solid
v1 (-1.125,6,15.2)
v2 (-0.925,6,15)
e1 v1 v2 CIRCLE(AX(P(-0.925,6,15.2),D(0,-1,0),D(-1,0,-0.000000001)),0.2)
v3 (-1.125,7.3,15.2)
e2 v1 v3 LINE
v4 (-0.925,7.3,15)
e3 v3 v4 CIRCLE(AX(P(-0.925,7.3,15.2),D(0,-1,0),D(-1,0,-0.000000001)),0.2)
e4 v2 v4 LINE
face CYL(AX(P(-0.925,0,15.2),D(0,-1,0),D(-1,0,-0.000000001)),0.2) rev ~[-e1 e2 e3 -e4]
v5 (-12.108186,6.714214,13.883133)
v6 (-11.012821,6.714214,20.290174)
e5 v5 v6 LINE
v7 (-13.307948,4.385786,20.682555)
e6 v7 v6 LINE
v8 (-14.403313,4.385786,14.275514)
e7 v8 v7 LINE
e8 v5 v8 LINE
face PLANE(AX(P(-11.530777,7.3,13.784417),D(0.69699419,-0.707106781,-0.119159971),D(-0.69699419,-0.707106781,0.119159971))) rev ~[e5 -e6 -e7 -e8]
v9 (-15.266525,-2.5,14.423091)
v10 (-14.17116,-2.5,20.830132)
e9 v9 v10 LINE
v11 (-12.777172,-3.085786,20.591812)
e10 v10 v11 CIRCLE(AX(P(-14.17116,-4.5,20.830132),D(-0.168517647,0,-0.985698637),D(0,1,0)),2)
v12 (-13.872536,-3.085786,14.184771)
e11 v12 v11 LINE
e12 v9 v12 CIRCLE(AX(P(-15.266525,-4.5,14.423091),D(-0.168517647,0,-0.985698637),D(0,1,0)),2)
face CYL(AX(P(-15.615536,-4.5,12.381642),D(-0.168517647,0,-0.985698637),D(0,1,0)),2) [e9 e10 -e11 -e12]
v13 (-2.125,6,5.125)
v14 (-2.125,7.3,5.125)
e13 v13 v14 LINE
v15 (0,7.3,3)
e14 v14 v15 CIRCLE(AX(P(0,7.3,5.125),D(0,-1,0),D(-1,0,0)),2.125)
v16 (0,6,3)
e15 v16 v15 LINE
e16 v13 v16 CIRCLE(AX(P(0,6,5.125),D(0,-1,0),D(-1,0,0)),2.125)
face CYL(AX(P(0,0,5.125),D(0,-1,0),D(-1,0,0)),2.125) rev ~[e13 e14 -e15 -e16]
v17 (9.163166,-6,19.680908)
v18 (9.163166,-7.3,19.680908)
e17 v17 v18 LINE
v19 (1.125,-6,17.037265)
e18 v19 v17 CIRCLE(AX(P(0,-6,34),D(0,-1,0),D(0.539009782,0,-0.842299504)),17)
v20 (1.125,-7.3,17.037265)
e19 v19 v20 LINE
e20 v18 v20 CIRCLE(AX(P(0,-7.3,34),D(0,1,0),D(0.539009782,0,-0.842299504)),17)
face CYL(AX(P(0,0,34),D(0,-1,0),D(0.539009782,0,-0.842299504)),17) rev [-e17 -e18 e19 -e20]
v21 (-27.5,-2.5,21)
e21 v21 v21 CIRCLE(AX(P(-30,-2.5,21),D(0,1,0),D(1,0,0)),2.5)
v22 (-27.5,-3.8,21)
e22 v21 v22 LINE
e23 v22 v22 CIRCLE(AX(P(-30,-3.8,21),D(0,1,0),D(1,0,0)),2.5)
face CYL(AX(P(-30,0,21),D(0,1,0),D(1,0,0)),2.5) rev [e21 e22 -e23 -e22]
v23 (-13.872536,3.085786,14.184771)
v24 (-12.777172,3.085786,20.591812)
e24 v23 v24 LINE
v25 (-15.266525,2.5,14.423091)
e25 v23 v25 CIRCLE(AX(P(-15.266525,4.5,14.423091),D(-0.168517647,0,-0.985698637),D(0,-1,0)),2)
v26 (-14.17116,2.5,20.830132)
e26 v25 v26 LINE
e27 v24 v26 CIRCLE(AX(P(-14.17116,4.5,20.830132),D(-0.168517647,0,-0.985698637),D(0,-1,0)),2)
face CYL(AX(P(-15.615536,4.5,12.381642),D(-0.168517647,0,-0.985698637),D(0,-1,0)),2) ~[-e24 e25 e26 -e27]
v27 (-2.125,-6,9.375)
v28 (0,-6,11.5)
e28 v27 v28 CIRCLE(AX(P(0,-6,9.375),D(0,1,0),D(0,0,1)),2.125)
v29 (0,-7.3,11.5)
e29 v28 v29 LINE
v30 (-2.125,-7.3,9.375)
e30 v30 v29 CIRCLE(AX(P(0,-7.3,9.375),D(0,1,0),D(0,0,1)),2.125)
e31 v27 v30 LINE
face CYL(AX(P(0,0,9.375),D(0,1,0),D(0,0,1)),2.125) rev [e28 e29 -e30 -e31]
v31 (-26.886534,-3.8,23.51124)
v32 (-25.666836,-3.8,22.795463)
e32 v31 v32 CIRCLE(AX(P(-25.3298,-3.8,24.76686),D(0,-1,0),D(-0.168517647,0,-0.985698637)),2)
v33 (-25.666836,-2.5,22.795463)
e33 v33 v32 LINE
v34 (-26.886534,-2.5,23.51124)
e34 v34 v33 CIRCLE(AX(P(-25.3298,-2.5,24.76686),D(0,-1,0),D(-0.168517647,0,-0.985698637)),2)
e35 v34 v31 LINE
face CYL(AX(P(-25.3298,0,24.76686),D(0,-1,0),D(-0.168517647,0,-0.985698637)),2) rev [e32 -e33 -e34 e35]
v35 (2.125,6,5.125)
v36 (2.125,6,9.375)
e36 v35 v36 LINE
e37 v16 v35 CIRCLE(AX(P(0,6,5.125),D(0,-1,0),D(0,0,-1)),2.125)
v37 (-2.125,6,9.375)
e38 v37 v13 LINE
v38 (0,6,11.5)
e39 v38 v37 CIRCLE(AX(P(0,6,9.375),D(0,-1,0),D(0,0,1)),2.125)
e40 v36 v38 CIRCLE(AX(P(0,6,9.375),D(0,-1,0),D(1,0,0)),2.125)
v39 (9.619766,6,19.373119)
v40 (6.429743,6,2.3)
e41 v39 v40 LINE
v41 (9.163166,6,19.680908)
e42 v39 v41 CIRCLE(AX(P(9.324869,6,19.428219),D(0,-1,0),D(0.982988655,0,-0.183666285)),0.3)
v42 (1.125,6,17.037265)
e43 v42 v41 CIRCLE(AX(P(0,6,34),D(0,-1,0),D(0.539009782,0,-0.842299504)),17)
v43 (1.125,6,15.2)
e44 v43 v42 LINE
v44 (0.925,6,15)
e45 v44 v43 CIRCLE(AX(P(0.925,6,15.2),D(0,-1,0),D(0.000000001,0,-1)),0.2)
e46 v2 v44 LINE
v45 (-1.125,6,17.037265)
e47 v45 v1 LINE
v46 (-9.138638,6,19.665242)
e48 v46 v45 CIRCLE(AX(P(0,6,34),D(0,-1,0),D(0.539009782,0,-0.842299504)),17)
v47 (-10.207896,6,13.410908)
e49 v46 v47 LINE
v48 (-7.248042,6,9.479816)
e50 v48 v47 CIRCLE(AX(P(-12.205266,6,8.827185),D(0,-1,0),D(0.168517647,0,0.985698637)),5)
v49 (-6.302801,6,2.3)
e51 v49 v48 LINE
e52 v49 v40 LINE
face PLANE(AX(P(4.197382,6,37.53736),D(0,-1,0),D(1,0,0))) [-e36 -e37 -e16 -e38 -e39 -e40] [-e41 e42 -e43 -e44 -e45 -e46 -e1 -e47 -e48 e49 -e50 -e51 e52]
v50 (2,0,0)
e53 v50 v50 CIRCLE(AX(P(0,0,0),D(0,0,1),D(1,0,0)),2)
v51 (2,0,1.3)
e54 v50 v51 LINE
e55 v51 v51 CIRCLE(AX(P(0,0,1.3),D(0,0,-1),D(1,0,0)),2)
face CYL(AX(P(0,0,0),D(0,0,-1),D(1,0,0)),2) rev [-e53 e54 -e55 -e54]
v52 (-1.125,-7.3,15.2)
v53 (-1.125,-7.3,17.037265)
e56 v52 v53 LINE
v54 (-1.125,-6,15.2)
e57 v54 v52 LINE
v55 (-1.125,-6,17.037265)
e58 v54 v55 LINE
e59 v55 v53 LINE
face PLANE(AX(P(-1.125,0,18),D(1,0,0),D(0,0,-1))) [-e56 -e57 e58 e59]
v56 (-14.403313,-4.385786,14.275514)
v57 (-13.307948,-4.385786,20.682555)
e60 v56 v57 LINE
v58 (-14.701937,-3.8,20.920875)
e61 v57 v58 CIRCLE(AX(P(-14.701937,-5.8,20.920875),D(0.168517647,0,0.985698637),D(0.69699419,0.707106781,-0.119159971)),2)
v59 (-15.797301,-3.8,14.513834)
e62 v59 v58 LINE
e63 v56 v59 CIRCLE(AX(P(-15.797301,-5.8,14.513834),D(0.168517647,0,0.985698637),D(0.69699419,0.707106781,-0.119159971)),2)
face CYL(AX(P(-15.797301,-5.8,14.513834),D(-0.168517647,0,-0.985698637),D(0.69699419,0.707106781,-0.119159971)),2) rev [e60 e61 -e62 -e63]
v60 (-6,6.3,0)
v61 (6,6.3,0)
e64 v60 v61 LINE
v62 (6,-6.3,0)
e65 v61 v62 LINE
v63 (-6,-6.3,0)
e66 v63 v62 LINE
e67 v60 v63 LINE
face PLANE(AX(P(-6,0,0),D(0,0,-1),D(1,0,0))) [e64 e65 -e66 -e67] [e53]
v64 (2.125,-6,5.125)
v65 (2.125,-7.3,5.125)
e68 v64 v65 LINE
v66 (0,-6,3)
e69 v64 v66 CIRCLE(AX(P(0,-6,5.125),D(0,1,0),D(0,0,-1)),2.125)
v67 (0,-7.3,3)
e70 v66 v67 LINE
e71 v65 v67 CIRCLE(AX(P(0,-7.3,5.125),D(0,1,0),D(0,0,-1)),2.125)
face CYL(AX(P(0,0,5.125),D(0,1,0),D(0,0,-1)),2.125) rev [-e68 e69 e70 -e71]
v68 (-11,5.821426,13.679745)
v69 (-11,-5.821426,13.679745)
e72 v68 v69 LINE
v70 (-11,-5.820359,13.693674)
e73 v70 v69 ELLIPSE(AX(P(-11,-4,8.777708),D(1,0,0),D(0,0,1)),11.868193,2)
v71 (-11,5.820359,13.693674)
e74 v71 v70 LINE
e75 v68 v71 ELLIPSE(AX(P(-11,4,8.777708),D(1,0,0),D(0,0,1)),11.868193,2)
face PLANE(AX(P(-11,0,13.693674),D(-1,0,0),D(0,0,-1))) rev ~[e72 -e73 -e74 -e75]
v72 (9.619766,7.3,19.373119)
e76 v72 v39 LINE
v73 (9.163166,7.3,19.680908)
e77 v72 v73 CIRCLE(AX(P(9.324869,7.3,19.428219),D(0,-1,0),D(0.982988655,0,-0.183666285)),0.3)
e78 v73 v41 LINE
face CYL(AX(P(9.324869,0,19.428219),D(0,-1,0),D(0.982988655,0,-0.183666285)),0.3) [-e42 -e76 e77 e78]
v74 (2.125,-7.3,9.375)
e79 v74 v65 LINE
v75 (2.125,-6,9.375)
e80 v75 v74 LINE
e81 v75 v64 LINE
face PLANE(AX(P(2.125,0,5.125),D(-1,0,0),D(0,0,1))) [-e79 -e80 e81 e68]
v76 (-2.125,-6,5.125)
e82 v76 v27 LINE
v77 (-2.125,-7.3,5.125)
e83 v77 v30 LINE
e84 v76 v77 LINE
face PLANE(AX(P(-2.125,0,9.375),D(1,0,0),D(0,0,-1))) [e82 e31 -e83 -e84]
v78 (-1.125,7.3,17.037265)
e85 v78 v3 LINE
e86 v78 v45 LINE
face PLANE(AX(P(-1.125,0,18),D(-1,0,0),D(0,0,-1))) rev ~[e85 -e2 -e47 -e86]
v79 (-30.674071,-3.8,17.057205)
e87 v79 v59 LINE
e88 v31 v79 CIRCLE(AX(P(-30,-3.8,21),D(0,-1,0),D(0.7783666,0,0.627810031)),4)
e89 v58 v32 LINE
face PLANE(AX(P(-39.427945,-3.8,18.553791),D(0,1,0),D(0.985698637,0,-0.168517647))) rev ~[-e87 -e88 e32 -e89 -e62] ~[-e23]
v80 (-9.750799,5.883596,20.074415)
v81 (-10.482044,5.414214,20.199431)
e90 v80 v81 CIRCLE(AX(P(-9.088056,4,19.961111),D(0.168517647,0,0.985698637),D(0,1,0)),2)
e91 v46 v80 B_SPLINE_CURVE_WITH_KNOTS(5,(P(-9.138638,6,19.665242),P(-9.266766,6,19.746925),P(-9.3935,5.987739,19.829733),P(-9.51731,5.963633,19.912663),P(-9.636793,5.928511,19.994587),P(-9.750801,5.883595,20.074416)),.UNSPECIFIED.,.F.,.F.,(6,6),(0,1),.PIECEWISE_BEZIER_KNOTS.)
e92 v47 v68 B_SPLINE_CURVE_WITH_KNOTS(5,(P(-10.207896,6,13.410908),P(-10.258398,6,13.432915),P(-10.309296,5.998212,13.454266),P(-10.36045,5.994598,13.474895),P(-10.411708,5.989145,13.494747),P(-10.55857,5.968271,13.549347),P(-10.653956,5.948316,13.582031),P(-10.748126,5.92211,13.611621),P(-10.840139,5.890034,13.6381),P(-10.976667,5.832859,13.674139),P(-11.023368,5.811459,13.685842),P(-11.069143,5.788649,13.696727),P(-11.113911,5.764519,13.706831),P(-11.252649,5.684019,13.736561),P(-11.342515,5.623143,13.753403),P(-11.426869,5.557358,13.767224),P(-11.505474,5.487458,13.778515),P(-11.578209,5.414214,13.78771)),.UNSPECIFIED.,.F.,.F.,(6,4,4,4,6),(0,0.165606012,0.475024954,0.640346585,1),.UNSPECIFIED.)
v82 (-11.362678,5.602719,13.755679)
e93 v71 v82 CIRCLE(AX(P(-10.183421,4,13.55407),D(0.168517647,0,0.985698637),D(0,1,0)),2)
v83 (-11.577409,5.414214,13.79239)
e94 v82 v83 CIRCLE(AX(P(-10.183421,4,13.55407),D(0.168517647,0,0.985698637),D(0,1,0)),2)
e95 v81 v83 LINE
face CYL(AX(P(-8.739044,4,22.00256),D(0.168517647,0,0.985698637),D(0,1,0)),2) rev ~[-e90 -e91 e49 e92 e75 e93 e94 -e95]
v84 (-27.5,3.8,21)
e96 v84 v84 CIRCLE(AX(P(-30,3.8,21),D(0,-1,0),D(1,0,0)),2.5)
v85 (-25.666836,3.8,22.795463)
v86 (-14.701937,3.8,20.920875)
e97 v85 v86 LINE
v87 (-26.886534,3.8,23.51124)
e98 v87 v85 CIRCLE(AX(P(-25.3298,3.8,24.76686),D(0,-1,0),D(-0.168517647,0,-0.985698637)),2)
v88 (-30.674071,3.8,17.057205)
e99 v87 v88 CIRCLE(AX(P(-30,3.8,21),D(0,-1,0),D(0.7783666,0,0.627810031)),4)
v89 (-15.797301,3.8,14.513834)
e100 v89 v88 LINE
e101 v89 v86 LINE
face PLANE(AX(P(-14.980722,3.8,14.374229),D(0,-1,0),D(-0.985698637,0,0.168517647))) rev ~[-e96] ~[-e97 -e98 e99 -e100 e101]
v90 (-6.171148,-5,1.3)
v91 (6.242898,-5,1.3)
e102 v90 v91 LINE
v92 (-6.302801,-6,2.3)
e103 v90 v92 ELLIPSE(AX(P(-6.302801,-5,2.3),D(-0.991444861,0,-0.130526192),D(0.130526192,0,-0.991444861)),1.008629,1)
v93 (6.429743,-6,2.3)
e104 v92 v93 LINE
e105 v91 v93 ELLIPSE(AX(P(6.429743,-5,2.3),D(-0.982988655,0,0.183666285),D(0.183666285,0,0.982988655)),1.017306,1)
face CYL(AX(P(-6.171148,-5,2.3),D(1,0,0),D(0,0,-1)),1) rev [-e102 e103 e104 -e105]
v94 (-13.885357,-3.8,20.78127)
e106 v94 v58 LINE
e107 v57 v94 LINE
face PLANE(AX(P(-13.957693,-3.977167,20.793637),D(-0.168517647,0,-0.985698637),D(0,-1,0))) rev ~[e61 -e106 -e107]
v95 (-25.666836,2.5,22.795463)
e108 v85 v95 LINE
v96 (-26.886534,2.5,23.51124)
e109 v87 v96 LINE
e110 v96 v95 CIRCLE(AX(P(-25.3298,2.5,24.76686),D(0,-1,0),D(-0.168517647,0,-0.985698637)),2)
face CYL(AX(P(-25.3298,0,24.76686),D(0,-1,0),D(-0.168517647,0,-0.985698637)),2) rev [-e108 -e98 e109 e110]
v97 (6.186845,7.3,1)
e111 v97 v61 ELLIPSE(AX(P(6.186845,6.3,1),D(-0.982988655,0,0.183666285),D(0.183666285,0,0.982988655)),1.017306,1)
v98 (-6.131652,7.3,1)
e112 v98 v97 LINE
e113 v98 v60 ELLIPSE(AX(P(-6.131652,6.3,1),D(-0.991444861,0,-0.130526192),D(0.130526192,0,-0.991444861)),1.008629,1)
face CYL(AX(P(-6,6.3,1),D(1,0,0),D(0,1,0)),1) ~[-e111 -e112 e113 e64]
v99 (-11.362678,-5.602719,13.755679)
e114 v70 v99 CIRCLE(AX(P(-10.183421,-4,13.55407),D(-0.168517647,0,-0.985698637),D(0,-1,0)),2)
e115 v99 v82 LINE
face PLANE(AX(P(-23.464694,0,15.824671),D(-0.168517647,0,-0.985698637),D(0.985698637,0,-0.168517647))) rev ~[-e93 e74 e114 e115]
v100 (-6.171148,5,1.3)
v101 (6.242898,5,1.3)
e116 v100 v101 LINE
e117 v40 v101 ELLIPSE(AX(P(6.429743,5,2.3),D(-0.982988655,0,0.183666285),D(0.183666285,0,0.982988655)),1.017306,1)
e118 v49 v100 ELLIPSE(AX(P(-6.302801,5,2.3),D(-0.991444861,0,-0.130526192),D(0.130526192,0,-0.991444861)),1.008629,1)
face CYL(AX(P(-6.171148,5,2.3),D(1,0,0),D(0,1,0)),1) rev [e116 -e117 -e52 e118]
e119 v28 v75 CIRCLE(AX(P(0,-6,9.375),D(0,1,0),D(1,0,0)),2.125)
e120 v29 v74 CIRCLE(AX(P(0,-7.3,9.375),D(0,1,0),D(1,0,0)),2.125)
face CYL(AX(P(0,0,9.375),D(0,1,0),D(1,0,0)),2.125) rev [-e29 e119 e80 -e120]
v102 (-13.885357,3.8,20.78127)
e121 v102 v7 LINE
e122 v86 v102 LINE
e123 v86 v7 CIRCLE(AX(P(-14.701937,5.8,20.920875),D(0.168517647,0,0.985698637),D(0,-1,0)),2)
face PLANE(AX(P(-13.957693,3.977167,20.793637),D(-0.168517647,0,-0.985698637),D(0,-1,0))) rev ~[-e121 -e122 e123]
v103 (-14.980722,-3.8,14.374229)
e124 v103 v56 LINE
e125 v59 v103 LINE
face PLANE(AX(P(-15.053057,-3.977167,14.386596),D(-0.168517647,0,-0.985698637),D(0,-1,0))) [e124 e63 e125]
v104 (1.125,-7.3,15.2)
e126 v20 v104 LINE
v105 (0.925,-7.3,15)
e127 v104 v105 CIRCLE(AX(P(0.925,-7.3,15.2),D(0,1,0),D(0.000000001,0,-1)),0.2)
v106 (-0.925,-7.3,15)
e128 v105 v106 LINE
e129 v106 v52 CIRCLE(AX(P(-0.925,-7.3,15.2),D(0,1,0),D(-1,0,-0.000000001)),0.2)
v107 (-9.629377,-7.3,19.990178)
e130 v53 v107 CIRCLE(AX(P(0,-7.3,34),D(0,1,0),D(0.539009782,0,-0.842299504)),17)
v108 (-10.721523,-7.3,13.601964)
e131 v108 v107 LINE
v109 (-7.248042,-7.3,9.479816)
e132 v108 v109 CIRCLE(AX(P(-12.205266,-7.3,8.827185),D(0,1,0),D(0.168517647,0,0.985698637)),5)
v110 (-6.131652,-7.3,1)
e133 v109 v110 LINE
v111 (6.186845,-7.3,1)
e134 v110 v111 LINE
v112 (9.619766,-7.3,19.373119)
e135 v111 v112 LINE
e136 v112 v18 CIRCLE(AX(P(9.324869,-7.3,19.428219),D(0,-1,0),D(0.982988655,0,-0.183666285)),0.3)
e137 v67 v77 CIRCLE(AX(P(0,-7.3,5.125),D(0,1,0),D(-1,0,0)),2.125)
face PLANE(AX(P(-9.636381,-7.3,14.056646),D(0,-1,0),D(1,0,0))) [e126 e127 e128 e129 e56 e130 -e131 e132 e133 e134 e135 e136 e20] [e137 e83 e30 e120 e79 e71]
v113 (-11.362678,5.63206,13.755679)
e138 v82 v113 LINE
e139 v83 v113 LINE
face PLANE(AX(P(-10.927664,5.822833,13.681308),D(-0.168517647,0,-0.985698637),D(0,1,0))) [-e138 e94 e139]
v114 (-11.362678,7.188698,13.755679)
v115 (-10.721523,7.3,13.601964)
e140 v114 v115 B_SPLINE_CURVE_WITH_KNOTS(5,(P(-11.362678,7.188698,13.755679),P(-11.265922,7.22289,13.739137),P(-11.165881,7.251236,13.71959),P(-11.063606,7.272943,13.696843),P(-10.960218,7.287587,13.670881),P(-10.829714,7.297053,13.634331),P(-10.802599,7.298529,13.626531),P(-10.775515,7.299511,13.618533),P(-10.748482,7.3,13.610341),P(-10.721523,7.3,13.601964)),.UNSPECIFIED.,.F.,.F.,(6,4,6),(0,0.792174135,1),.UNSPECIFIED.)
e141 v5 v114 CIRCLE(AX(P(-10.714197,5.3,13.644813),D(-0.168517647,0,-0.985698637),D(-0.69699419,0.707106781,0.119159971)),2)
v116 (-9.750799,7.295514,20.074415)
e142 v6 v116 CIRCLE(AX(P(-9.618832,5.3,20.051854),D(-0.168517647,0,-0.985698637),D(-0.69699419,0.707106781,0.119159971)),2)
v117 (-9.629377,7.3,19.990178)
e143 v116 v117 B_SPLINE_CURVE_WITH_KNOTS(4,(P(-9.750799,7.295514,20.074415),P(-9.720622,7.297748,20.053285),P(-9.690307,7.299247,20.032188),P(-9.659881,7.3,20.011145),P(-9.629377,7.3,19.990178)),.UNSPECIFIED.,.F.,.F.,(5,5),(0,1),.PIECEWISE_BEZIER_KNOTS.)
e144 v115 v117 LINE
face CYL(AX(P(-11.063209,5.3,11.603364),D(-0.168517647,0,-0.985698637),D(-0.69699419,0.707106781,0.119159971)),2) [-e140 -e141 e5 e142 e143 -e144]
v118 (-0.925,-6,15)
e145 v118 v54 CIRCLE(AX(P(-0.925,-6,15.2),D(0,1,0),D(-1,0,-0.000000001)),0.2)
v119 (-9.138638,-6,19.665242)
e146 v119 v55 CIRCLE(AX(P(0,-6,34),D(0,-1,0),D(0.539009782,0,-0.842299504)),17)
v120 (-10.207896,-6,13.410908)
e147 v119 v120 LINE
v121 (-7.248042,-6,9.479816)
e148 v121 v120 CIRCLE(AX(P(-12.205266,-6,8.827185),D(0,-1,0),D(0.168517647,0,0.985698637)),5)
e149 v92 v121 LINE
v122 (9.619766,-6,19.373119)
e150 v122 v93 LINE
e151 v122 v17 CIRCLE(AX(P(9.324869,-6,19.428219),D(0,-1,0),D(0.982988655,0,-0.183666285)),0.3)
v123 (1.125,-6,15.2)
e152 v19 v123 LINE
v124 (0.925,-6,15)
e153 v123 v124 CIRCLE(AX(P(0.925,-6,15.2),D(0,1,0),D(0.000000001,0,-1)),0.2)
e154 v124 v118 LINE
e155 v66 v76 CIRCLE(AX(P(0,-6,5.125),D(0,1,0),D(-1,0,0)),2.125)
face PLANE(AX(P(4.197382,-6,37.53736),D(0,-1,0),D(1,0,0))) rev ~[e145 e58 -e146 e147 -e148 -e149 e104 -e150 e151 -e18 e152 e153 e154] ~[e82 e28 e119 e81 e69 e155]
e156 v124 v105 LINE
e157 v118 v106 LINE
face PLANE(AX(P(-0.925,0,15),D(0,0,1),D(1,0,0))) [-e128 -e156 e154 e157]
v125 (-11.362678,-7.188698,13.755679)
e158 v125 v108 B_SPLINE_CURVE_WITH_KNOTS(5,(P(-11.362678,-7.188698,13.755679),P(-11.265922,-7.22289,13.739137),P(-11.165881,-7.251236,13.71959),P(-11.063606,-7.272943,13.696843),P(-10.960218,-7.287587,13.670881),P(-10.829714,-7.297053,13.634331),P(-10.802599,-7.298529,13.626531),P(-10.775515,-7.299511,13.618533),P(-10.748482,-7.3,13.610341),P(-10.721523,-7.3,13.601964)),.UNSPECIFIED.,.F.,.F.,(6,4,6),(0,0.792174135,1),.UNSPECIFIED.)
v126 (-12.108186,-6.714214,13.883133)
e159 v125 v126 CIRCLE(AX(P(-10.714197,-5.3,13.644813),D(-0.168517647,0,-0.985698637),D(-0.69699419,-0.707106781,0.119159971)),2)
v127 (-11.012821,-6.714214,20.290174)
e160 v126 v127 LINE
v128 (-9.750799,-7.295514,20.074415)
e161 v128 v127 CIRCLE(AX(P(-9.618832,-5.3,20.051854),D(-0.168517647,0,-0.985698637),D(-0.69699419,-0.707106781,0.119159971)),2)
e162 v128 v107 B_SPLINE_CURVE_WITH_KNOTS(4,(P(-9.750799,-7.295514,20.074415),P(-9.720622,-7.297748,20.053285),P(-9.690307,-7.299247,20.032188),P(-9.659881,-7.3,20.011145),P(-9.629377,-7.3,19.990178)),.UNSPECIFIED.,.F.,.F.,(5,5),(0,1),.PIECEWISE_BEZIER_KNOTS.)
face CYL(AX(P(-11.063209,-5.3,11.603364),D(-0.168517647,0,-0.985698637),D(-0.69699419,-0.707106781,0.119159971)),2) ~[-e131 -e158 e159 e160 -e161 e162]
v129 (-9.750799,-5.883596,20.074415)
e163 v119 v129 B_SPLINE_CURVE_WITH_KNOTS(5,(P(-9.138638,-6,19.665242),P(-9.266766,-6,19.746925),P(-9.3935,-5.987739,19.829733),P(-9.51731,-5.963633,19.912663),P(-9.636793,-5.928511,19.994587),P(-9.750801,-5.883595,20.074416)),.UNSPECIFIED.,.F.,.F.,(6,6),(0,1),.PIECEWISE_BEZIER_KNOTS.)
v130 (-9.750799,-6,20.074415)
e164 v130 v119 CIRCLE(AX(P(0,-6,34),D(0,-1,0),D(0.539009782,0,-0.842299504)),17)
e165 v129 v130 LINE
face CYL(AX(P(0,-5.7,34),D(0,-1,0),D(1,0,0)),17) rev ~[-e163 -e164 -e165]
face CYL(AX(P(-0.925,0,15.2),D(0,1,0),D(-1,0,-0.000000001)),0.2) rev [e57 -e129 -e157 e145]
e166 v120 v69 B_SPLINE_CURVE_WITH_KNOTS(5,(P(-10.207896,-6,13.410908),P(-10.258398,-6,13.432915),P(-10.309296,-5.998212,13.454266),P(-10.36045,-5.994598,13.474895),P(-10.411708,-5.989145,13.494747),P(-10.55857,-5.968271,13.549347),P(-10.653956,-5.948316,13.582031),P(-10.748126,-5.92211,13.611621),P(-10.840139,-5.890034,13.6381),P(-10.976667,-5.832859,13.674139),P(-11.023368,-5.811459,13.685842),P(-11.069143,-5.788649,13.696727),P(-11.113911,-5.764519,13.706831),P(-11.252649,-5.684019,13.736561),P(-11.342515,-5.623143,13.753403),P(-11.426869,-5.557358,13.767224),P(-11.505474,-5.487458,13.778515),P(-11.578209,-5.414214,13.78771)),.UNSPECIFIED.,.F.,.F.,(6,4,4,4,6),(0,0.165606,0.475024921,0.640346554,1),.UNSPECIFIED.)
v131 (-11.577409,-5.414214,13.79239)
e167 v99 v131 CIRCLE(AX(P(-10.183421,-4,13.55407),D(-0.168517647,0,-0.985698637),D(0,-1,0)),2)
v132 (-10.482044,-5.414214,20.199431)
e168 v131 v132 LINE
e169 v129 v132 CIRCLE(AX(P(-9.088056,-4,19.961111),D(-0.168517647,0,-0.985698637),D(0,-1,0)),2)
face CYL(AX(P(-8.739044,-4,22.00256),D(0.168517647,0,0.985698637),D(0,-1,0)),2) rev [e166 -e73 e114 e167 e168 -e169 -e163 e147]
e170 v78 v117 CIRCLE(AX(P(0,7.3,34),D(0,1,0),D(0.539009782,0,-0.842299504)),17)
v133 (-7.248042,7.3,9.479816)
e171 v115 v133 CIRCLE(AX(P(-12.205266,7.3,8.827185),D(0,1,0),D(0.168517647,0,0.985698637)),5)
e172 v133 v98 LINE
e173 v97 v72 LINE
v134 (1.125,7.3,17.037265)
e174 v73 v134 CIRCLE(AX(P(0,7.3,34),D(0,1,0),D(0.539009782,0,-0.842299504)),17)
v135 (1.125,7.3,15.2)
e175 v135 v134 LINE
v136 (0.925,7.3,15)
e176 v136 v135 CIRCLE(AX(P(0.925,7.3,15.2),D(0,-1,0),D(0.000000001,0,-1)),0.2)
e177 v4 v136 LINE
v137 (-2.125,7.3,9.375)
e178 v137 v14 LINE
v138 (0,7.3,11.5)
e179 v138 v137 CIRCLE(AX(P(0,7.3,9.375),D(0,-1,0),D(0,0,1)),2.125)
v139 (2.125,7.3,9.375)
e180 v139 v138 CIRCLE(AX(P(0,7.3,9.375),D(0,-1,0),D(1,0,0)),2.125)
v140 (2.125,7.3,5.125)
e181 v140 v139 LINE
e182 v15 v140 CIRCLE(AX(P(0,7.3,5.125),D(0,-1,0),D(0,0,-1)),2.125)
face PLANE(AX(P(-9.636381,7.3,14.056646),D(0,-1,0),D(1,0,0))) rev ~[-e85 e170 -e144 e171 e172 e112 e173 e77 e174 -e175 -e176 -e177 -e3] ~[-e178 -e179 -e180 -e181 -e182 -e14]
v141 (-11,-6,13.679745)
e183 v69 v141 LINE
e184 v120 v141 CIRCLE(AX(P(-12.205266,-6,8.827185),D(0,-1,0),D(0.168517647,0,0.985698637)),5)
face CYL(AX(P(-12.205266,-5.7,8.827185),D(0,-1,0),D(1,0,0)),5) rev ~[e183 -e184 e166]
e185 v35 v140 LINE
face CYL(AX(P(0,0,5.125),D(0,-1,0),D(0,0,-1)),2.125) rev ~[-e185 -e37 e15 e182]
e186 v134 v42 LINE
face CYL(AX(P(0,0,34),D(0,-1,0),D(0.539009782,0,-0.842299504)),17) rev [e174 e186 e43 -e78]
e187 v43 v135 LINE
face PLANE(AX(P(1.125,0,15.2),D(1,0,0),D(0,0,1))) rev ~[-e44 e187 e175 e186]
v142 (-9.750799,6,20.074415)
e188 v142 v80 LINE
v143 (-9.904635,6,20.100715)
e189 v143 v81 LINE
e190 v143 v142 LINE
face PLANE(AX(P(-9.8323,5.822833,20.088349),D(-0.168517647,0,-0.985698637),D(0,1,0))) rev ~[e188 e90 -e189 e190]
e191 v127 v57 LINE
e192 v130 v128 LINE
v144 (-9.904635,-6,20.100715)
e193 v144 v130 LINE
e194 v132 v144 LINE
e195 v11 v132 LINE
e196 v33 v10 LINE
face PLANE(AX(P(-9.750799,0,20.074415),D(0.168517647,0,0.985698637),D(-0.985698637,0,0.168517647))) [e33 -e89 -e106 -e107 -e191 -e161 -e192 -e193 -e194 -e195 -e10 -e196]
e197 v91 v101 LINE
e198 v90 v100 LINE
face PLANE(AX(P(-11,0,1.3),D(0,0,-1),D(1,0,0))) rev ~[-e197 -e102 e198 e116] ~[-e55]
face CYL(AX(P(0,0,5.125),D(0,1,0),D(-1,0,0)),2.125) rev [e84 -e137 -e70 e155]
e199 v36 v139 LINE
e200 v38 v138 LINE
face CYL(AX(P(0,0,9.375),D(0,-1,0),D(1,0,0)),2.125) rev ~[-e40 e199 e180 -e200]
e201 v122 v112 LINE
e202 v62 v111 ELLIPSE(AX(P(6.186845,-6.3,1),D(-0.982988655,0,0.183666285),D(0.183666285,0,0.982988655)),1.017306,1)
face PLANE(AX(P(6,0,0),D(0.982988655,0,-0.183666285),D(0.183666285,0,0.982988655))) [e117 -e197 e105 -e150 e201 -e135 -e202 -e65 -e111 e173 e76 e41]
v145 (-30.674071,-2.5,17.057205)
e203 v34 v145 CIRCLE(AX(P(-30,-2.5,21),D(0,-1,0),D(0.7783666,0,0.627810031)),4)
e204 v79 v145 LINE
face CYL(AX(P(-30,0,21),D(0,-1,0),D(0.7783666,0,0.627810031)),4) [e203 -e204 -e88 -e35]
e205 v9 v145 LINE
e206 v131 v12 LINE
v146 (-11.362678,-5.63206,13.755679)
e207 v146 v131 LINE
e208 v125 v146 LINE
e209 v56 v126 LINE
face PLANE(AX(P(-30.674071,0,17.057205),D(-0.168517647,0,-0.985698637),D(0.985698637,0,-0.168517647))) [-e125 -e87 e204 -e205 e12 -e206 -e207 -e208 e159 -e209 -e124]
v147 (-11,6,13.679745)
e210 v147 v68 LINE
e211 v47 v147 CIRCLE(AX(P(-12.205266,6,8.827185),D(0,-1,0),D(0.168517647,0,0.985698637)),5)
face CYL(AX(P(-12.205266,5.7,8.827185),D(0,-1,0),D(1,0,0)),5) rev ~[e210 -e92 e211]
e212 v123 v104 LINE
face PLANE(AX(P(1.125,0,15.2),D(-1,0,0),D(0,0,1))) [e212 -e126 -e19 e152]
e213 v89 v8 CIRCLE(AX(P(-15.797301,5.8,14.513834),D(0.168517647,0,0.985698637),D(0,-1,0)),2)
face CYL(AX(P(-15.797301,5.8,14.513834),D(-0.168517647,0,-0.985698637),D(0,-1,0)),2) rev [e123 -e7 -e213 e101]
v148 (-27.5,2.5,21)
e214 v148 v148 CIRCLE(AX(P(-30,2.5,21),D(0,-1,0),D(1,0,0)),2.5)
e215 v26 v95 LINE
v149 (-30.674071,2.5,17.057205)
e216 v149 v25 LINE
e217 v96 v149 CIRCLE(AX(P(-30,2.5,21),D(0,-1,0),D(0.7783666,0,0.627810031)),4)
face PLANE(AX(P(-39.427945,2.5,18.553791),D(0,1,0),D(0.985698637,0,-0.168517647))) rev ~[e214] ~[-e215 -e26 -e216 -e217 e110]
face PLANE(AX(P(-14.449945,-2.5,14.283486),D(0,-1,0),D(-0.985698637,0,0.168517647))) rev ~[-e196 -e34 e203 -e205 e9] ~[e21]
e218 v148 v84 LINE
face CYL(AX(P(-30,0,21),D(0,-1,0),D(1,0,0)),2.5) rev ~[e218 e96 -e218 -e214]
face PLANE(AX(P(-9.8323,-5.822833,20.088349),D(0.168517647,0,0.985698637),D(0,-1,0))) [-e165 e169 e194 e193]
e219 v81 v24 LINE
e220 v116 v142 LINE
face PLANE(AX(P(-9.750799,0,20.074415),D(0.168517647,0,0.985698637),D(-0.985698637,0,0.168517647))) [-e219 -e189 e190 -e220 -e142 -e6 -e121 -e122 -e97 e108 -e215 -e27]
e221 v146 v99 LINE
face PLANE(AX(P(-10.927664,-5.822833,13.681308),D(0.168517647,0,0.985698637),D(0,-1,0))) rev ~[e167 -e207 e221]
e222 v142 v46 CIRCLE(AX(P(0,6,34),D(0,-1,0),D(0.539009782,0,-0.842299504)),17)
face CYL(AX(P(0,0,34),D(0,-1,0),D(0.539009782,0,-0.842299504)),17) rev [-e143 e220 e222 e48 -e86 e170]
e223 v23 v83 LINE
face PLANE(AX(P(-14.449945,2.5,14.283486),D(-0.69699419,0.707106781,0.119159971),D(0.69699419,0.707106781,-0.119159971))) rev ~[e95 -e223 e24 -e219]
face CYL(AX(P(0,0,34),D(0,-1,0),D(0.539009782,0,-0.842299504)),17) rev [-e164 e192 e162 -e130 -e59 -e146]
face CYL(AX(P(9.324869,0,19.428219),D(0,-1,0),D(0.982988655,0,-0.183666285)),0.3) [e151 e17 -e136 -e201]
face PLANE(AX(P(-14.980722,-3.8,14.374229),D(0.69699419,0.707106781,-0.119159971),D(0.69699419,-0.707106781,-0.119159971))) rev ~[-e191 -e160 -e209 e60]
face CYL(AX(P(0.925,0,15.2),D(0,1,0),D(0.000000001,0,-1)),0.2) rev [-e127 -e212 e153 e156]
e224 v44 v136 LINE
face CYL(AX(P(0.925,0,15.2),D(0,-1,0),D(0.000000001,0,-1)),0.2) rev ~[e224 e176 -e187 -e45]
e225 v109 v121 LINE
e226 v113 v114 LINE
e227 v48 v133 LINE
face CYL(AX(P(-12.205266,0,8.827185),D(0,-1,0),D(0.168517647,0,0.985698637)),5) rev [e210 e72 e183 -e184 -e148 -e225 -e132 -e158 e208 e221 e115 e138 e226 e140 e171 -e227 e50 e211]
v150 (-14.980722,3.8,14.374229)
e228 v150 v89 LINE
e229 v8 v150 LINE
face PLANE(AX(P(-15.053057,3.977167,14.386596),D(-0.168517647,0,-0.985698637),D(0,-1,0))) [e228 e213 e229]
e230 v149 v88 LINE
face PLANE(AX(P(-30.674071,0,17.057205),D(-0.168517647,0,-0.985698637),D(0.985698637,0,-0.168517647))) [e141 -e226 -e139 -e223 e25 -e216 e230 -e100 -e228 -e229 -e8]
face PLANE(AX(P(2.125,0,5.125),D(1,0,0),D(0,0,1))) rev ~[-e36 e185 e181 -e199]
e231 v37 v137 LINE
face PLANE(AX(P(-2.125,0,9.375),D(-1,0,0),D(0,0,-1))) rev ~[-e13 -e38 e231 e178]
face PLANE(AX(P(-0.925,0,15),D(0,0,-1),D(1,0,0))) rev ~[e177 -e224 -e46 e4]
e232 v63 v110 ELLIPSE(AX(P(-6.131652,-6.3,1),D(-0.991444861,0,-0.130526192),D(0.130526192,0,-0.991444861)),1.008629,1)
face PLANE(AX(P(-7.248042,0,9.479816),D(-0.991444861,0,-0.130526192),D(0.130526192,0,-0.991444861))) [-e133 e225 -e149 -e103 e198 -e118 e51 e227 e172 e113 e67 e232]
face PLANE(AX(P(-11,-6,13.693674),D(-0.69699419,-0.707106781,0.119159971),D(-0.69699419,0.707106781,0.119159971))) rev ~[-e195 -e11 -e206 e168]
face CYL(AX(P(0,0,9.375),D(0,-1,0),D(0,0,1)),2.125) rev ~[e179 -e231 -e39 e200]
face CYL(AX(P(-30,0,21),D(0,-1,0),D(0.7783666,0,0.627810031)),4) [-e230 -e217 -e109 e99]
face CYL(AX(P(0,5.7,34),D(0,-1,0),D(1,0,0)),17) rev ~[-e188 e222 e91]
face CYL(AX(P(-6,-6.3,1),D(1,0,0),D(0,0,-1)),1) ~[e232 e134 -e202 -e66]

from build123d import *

# Parameters (mm, degrees)
F1_DEPTH       = 7.3
F1_DEPTH_BACK  = 7.3
F3_DEPTH       = 6
F3_DEPTH_BACK  = 6
F5_DEPTH       = 10
F5_DEPTH_BACK  = 10
F8_DEPTH       = 25
F9_R           = 2.5
F10_DEPTH      = 10
F10_DEPTH_BACK = 10
F11_T1_DEPTH   = 6.5
F11_T6_DEPTH   = 12.7132034356
F11_S7_R       = 5
F11_T8_DEPTH   = 8
F11_S10_R      = 17
F11_T11_DEPTH  = 8
F11_T15_DEPTH  = 8.5710678119
F11_T20_DEPTH  = 12.7132034356
F11_S21_R      = 5
F11_T22_DEPTH  = 8
F11_S24_R      = 17
F11_T25_DEPTH  = 8
F11_T29_DEPTH  = 8.5710678119
F11_T31_DEPTH  = 10.6421356237
F12_R          = 1
F13_R          = 2
F14_DEPTH      = 5


# Not quite as in the source:
# - a fillet or chamfer that OpenCascade refuses, or shapes differently, is made with other operations: its cross-section is extruded or revolved along the edge and cut away or added


with BuildPart() as f1:
    # F0 (on Front) → F1 (new body, two sides)
    with BuildSketch(Plane.XZ) as f1_sk:
        with BuildLine():
            Line((-7.2480415045, 9.479816391), (-6, 0))
            Line((-6, 0), (6, 0))
            Line((6, 0), (9.6197658273, 19.3731186918))
            ThreePointArc((9.6197658273, 19.3731186918), (9.492555749, 19.6769779623), (9.1631662961, 19.6809084286))
            ThreePointArc((9.1631662961, 19.6809084286), (-0.3536100614, 17.0036780472), (-9.750799418, 20.0744152471))
            Line((-9.750799418, 20.0744152471), (-25.666835692, 22.7954629152))
            ThreePointArc((-25.666835692, 22.7954629152), (-26.3420622378, 23.0419468668), (-26.8865335991, 23.511240126))
            ThreePointArc((-26.8865335991, 23.511240126), (-33.4498266444, 23.0245236782), (-30.6740705867, 17.0572054525))
            Line((-30.6740705867, 17.0572054525), (-11.362677578, 13.7556786143))
            ThreePointArc((-11.362677578, 13.7556786143), (-8.6024605414, 12.2941429125), (-7.2480415045, 9.479816391))
        make_face()
    extrude(amount=F1_DEPTH)
    extrude(f1_sk.sketch, amount=-F1_DEPTH_BACK)

    # F2 (on Front) → F3 (cut, two sides)
    with BuildSketch(Plane.XZ) as f3_sk:
        Polygon((15, 1.3), (15, 78.0352148958), (0, 78.0352148958), (-11, 13.6936742961), (-11, 1.3), align=None)
    extrude(amount=F3_DEPTH, mode=Mode.SUBTRACT)
    extrude(f3_sk.sketch, amount=-F3_DEPTH_BACK, mode=Mode.SUBTRACT)

    # F4 (on Front) → F5 (cut, two sides)
    with BuildSketch(Plane.XZ) as f5_sk:
        with BuildLine():
            Line((0, 18), (-1.125, 18))
            Line((-1.125, 18), (-1.125, 15.2))
            ThreePointArc((-1.125, 15.2), (-1.0664213562, 15.0585786438), (-0.925, 15))
            Line((-0.925, 15), (0, 15))
            Line((0, 15), (0.925, 15))
            ThreePointArc((0.925, 15), (1.0664213562, 15.0585786438), (1.125, 15.2))
            Line((1.125, 15.2), (1.125, 18))
            Line((1.125, 18), (0, 18))
        make_face()
        with BuildLine():
            ThreePointArc((0, 11.5), (-1.50260191, 10.87760191), (-2.125, 9.375))
            Line((-2.125, 9.375), (-2.125, 5.125))
            ThreePointArc((-2.125, 5.125), (-1.50260191, 3.62239809), (0, 3))
            ThreePointArc((0, 3), (1.50260191, 3.62239809), (2.125, 5.125))
            Line((2.125, 5.125), (2.125, 9.375))
            ThreePointArc((2.125, 9.375), (1.50260191, 10.87760191), (0, 11.5))
        make_face()
    extrude(amount=F5_DEPTH, mode=Mode.SUBTRACT)
    extrude(f5_sk.sketch, amount=-F5_DEPTH_BACK, mode=Mode.SUBTRACT)

    # F7 (on offset) → F8 (cut)
    with BuildSketch(Plane(origin=(1.9622434031, 0, 11.4776148716), x_dir=(0.9856986369, 0, -0.1685176467), z_dir=(-0.1685176467, 0, -0.9856986369))):
        Polygon((-41.9907133171, -7.3), (-13.6887884036, -7.3), (-17.1887884036, -3.8), (-41.9907133171, -3.8), align=None)
        Polygon((-41.9907133171, 7.3), (-41.9907133171, 3.8), (-17.1887884036, 3.8), (-13.6887884036, 7.3), align=None)
        Polygon((-16.6503107725, -2.5), (-13.1503107725, -6), (-13.1503107725, 0), (-13.1503107725, 6), (-16.6503107725, 2.5), (-41.9907133171, 2.5), (-41.9907133171, 0), (-41.9907133171, -2.5), align=None)
    extrude(amount=-F8_DEPTH, mode=Mode.SUBTRACT)

    # F9 (on Front) → F10 (cut, two sides)
    with BuildSketch(Plane.XZ) as f10_sk:
        with Locations((-30, 21)):
            Circle(F9_R)
    extrude(amount=F10_DEPTH, mode=Mode.SUBTRACT)
    extrude(f10_sk.sketch, amount=-F10_DEPTH_BACK, mode=Mode.SUBTRACT)

    # F11: fillet of radius 2 on 8 edges, made by hand

    # F11_s2 → F11_t1 (join)
    with BuildSketch(Plane(origin=(1.9622434031, 0, 11.4776148716), x_dir=(0, 1, 0), z_dir=(0.1685176467, 0, 0.9856986369))):
        with BuildLine():
            ThreePointArc((3.8, 18.0172155284), (3.952240935, 17.2518486636), (4.3857864376, 16.603001966))
            Line((4.3857864376, 16.603001966), (3.8, 17.1887884036))
            Line((3.8, 17.1887884036), (3.8, 18.0172155284))
        make_face()
        with BuildLine():
            ThreePointArc((-4.3857864376, 16.603001966), (-3.952240935, 17.2518486636), (-3.8, 18.0172155284))
            Line((-3.8, 18.0172155284), (-3.8, 17.1887884036))
            Line((-3.8, 17.1887884036), (-4.3857864376, 16.603001966))
        make_face()
    extrude(amount=F11_T1_DEPTH)


with BuildPart() as f11_tool4:
    # F11_s5 → F11_t6 (new body)
    with BuildSketch(Plane(origin=(3.0576081065, 0, 17.8846560114), x_dir=(0, 1, 0), z_dir=(-0.1685176467, 0, -0.9856986369))):
        with BuildLine():
            ThreePointArc((-6, -12.3218836478), (-5.847759065, -13.0872505125), (-5.4142135624, -13.7360972102))
            Line((-5.4142135624, -13.7360972102), (-6, -13.1503107725))
            Line((-6, -13.1503107725), (-6, -12.3218836478))
        make_face()
    extrude(amount=F11_T6_DEPTH)

    # F11_s7 → F11_t8 (cut, symmetric)
    with BuildSketch(Plane.XZ.offset(5.7)):
        with Locations((-12.2052658114, 8.8271854299)):
            Circle(F11_S7_R)
    extrude(amount=F11_T8_DEPTH, both=True, mode=Mode.SUBTRACT)

    split(bisect_by=Plane.YZ.offset(-11), keep=Keep.TOP)

    # F11_s10 → F11_t11 (cut, symmetric)
    with BuildSketch(Plane.XZ.offset(5.7)):
        with Locations((0, 34)):
            Circle(F11_S10_R)
    extrude(amount=F11_T11_DEPTH, both=True, mode=Mode.SUBTRACT)


with BuildPart() as f1_1:
    add(f1.part)

    # F11_t3: union F11_tool4
    add(f11_tool4.part)


with BuildPart() as f11_tool13:
    # F11_s14 → F11_t15 (new body)
    with BuildSketch(Plane(origin=(3.4066195803, 0, 19.9261047304), x_dir=(0, 1, 0), z_dir=(-0.1685176467, 0, -0.9856986369))):
        with BuildLine():
            ThreePointArc((-6, -12.3218836478), (-5.847759065, -13.0872505125), (-5.4142135624, -13.7360972102))
            Line((-5.4142135624, -13.7360972102), (-6, -13.1503107725))
            Line((-6, -13.1503107725), (-6, -12.3218836478))
        make_face()
    extrude(amount=F11_T15_DEPTH)

    split(bisect_by=Plane.YZ.offset(-11), keep=Keep.BOTTOM)


with BuildPart() as f1_2:
    add(f1_1.part)

    # F11_t12: union F11_tool13
    add(f11_tool13.part)


with BuildPart() as f11_tool18:
    # F11_s19 → F11_t20 (new body)
    with BuildSketch(Plane(origin=(3.0576081065, 0, 17.8846560114), x_dir=(0, 1, 0), z_dir=(-0.1685176467, 0, -0.9856986369))):
        with BuildLine():
            ThreePointArc((6, -12.3218836478), (5.847759065, -13.0872505125), (5.4142135624, -13.7360972102))
            Line((5.4142135624, -13.7360972102), (6, -13.1503107725))
            Line((6, -13.1503107725), (6, -12.3218836478))
        make_face()
    extrude(amount=F11_T20_DEPTH)

    # F11_s21 → F11_t22 (cut, symmetric)
    with BuildSketch(Plane.XZ.offset(-5.7)):
        with Locations((-12.2052658114, 8.8271854299)):
            Circle(F11_S21_R)
    extrude(amount=F11_T22_DEPTH, both=True, mode=Mode.SUBTRACT)

    split(bisect_by=Plane.YZ.offset(-11), keep=Keep.TOP)

    # F11_s24 → F11_t25 (cut, symmetric)
    with BuildSketch(Plane.XZ.offset(-5.7)):
        with Locations((0, 34)):
            Circle(F11_S24_R)
    extrude(amount=F11_T25_DEPTH, both=True, mode=Mode.SUBTRACT)


with BuildPart() as f1_3:
    add(f1_2.part)

    # F11_t17: union F11_tool18
    add(f11_tool18.part)


with BuildPart() as f11_tool27:
    # F11_s28 → F11_t29 (new body)
    with BuildSketch(Plane(origin=(3.4066195803, 0, 19.9261047304), x_dir=(0, 1, 0), z_dir=(-0.1685176467, 0, -0.9856986369))):
        with BuildLine():
            ThreePointArc((6, -12.3218836478), (5.847759065, -13.0872505125), (5.4142135624, -13.7360972102))
            Line((5.4142135624, -13.7360972102), (6, -13.1503107725))
            Line((6, -13.1503107725), (6, -12.3218836478))
        make_face()
    extrude(amount=F11_T29_DEPTH)

    split(bisect_by=Plane.YZ.offset(-11), keep=Keep.BOTTOM)


with BuildPart() as f1_4:
    add(f1_3.part)

    # F11_t26: union F11_tool27
    add(f11_tool27.part)

    # F11_s32 → F11_t31 (cut)
    with BuildSketch(Plane(origin=(1.6132319293, 0, 9.4361661525), x_dir=(0, 1, 0), z_dir=(0.1685176467, 0, 0.9856986369))):
        with BuildLine():
            ThreePointArc((6.7142135624, 14.2745748413), (7.147759065, 13.6257281436), (7.3, 12.8603612789))
            Line((7.3, 12.8603612789), (7.3, 13.6887884036))
            Line((7.3, 13.6887884036), (6.7142135624, 14.2745748413))
        make_face()
        with BuildLine():
            ThreePointArc((-2.5, 17.4787378973), (-2.652240935, 16.7133710326), (-3.0857864376, 16.0645243349))
            Line((-3.0857864376, 16.0645243349), (-2.5, 16.6503107725))
            Line((-2.5, 16.6503107725), (-2.5, 17.4787378973))
        make_face()
        with BuildLine():
            ThreePointArc((-6.7142135624, 14.2745748413), (-7.147759065, 13.6257281436), (-7.3, 12.8603612789))
            Line((-7.3, 12.8603612789), (-7.3, 13.6887884036))
            Line((-7.3, 13.6887884036), (-6.7142135624, 14.2745748413))
        make_face()
        with BuildLine():
            ThreePointArc((2.5, 17.4787378973), (2.652240935, 16.7133710326), (3.0857864376, 16.0645243349))
            Line((3.0857864376, 16.0645243349), (2.5, 16.6503107725))
            Line((2.5, 16.6503107725), (2.5, 17.4787378973))
        make_face()
    extrude(amount=F11_T31_DEPTH, mode=Mode.SUBTRACT)

    # F12
    f12_edges = [f1_4.edges().sort_by_distance(p)[0] for p in [
        (0.035875, 6, 1.3),
        (0, -7.3, 0),
        (0.035875, -6, 1.3),
        (0, 7.3, 0),
    ]]
    fillet(f12_edges, radius=F12_R)

    # F13 (on Top) → F14 (cut)
    with BuildSketch(Plane.XY):
        Circle(F13_R)
    extrude(amount=F14_DEPTH, mode=Mode.SUBTRACT)


solid = f1_4.part
